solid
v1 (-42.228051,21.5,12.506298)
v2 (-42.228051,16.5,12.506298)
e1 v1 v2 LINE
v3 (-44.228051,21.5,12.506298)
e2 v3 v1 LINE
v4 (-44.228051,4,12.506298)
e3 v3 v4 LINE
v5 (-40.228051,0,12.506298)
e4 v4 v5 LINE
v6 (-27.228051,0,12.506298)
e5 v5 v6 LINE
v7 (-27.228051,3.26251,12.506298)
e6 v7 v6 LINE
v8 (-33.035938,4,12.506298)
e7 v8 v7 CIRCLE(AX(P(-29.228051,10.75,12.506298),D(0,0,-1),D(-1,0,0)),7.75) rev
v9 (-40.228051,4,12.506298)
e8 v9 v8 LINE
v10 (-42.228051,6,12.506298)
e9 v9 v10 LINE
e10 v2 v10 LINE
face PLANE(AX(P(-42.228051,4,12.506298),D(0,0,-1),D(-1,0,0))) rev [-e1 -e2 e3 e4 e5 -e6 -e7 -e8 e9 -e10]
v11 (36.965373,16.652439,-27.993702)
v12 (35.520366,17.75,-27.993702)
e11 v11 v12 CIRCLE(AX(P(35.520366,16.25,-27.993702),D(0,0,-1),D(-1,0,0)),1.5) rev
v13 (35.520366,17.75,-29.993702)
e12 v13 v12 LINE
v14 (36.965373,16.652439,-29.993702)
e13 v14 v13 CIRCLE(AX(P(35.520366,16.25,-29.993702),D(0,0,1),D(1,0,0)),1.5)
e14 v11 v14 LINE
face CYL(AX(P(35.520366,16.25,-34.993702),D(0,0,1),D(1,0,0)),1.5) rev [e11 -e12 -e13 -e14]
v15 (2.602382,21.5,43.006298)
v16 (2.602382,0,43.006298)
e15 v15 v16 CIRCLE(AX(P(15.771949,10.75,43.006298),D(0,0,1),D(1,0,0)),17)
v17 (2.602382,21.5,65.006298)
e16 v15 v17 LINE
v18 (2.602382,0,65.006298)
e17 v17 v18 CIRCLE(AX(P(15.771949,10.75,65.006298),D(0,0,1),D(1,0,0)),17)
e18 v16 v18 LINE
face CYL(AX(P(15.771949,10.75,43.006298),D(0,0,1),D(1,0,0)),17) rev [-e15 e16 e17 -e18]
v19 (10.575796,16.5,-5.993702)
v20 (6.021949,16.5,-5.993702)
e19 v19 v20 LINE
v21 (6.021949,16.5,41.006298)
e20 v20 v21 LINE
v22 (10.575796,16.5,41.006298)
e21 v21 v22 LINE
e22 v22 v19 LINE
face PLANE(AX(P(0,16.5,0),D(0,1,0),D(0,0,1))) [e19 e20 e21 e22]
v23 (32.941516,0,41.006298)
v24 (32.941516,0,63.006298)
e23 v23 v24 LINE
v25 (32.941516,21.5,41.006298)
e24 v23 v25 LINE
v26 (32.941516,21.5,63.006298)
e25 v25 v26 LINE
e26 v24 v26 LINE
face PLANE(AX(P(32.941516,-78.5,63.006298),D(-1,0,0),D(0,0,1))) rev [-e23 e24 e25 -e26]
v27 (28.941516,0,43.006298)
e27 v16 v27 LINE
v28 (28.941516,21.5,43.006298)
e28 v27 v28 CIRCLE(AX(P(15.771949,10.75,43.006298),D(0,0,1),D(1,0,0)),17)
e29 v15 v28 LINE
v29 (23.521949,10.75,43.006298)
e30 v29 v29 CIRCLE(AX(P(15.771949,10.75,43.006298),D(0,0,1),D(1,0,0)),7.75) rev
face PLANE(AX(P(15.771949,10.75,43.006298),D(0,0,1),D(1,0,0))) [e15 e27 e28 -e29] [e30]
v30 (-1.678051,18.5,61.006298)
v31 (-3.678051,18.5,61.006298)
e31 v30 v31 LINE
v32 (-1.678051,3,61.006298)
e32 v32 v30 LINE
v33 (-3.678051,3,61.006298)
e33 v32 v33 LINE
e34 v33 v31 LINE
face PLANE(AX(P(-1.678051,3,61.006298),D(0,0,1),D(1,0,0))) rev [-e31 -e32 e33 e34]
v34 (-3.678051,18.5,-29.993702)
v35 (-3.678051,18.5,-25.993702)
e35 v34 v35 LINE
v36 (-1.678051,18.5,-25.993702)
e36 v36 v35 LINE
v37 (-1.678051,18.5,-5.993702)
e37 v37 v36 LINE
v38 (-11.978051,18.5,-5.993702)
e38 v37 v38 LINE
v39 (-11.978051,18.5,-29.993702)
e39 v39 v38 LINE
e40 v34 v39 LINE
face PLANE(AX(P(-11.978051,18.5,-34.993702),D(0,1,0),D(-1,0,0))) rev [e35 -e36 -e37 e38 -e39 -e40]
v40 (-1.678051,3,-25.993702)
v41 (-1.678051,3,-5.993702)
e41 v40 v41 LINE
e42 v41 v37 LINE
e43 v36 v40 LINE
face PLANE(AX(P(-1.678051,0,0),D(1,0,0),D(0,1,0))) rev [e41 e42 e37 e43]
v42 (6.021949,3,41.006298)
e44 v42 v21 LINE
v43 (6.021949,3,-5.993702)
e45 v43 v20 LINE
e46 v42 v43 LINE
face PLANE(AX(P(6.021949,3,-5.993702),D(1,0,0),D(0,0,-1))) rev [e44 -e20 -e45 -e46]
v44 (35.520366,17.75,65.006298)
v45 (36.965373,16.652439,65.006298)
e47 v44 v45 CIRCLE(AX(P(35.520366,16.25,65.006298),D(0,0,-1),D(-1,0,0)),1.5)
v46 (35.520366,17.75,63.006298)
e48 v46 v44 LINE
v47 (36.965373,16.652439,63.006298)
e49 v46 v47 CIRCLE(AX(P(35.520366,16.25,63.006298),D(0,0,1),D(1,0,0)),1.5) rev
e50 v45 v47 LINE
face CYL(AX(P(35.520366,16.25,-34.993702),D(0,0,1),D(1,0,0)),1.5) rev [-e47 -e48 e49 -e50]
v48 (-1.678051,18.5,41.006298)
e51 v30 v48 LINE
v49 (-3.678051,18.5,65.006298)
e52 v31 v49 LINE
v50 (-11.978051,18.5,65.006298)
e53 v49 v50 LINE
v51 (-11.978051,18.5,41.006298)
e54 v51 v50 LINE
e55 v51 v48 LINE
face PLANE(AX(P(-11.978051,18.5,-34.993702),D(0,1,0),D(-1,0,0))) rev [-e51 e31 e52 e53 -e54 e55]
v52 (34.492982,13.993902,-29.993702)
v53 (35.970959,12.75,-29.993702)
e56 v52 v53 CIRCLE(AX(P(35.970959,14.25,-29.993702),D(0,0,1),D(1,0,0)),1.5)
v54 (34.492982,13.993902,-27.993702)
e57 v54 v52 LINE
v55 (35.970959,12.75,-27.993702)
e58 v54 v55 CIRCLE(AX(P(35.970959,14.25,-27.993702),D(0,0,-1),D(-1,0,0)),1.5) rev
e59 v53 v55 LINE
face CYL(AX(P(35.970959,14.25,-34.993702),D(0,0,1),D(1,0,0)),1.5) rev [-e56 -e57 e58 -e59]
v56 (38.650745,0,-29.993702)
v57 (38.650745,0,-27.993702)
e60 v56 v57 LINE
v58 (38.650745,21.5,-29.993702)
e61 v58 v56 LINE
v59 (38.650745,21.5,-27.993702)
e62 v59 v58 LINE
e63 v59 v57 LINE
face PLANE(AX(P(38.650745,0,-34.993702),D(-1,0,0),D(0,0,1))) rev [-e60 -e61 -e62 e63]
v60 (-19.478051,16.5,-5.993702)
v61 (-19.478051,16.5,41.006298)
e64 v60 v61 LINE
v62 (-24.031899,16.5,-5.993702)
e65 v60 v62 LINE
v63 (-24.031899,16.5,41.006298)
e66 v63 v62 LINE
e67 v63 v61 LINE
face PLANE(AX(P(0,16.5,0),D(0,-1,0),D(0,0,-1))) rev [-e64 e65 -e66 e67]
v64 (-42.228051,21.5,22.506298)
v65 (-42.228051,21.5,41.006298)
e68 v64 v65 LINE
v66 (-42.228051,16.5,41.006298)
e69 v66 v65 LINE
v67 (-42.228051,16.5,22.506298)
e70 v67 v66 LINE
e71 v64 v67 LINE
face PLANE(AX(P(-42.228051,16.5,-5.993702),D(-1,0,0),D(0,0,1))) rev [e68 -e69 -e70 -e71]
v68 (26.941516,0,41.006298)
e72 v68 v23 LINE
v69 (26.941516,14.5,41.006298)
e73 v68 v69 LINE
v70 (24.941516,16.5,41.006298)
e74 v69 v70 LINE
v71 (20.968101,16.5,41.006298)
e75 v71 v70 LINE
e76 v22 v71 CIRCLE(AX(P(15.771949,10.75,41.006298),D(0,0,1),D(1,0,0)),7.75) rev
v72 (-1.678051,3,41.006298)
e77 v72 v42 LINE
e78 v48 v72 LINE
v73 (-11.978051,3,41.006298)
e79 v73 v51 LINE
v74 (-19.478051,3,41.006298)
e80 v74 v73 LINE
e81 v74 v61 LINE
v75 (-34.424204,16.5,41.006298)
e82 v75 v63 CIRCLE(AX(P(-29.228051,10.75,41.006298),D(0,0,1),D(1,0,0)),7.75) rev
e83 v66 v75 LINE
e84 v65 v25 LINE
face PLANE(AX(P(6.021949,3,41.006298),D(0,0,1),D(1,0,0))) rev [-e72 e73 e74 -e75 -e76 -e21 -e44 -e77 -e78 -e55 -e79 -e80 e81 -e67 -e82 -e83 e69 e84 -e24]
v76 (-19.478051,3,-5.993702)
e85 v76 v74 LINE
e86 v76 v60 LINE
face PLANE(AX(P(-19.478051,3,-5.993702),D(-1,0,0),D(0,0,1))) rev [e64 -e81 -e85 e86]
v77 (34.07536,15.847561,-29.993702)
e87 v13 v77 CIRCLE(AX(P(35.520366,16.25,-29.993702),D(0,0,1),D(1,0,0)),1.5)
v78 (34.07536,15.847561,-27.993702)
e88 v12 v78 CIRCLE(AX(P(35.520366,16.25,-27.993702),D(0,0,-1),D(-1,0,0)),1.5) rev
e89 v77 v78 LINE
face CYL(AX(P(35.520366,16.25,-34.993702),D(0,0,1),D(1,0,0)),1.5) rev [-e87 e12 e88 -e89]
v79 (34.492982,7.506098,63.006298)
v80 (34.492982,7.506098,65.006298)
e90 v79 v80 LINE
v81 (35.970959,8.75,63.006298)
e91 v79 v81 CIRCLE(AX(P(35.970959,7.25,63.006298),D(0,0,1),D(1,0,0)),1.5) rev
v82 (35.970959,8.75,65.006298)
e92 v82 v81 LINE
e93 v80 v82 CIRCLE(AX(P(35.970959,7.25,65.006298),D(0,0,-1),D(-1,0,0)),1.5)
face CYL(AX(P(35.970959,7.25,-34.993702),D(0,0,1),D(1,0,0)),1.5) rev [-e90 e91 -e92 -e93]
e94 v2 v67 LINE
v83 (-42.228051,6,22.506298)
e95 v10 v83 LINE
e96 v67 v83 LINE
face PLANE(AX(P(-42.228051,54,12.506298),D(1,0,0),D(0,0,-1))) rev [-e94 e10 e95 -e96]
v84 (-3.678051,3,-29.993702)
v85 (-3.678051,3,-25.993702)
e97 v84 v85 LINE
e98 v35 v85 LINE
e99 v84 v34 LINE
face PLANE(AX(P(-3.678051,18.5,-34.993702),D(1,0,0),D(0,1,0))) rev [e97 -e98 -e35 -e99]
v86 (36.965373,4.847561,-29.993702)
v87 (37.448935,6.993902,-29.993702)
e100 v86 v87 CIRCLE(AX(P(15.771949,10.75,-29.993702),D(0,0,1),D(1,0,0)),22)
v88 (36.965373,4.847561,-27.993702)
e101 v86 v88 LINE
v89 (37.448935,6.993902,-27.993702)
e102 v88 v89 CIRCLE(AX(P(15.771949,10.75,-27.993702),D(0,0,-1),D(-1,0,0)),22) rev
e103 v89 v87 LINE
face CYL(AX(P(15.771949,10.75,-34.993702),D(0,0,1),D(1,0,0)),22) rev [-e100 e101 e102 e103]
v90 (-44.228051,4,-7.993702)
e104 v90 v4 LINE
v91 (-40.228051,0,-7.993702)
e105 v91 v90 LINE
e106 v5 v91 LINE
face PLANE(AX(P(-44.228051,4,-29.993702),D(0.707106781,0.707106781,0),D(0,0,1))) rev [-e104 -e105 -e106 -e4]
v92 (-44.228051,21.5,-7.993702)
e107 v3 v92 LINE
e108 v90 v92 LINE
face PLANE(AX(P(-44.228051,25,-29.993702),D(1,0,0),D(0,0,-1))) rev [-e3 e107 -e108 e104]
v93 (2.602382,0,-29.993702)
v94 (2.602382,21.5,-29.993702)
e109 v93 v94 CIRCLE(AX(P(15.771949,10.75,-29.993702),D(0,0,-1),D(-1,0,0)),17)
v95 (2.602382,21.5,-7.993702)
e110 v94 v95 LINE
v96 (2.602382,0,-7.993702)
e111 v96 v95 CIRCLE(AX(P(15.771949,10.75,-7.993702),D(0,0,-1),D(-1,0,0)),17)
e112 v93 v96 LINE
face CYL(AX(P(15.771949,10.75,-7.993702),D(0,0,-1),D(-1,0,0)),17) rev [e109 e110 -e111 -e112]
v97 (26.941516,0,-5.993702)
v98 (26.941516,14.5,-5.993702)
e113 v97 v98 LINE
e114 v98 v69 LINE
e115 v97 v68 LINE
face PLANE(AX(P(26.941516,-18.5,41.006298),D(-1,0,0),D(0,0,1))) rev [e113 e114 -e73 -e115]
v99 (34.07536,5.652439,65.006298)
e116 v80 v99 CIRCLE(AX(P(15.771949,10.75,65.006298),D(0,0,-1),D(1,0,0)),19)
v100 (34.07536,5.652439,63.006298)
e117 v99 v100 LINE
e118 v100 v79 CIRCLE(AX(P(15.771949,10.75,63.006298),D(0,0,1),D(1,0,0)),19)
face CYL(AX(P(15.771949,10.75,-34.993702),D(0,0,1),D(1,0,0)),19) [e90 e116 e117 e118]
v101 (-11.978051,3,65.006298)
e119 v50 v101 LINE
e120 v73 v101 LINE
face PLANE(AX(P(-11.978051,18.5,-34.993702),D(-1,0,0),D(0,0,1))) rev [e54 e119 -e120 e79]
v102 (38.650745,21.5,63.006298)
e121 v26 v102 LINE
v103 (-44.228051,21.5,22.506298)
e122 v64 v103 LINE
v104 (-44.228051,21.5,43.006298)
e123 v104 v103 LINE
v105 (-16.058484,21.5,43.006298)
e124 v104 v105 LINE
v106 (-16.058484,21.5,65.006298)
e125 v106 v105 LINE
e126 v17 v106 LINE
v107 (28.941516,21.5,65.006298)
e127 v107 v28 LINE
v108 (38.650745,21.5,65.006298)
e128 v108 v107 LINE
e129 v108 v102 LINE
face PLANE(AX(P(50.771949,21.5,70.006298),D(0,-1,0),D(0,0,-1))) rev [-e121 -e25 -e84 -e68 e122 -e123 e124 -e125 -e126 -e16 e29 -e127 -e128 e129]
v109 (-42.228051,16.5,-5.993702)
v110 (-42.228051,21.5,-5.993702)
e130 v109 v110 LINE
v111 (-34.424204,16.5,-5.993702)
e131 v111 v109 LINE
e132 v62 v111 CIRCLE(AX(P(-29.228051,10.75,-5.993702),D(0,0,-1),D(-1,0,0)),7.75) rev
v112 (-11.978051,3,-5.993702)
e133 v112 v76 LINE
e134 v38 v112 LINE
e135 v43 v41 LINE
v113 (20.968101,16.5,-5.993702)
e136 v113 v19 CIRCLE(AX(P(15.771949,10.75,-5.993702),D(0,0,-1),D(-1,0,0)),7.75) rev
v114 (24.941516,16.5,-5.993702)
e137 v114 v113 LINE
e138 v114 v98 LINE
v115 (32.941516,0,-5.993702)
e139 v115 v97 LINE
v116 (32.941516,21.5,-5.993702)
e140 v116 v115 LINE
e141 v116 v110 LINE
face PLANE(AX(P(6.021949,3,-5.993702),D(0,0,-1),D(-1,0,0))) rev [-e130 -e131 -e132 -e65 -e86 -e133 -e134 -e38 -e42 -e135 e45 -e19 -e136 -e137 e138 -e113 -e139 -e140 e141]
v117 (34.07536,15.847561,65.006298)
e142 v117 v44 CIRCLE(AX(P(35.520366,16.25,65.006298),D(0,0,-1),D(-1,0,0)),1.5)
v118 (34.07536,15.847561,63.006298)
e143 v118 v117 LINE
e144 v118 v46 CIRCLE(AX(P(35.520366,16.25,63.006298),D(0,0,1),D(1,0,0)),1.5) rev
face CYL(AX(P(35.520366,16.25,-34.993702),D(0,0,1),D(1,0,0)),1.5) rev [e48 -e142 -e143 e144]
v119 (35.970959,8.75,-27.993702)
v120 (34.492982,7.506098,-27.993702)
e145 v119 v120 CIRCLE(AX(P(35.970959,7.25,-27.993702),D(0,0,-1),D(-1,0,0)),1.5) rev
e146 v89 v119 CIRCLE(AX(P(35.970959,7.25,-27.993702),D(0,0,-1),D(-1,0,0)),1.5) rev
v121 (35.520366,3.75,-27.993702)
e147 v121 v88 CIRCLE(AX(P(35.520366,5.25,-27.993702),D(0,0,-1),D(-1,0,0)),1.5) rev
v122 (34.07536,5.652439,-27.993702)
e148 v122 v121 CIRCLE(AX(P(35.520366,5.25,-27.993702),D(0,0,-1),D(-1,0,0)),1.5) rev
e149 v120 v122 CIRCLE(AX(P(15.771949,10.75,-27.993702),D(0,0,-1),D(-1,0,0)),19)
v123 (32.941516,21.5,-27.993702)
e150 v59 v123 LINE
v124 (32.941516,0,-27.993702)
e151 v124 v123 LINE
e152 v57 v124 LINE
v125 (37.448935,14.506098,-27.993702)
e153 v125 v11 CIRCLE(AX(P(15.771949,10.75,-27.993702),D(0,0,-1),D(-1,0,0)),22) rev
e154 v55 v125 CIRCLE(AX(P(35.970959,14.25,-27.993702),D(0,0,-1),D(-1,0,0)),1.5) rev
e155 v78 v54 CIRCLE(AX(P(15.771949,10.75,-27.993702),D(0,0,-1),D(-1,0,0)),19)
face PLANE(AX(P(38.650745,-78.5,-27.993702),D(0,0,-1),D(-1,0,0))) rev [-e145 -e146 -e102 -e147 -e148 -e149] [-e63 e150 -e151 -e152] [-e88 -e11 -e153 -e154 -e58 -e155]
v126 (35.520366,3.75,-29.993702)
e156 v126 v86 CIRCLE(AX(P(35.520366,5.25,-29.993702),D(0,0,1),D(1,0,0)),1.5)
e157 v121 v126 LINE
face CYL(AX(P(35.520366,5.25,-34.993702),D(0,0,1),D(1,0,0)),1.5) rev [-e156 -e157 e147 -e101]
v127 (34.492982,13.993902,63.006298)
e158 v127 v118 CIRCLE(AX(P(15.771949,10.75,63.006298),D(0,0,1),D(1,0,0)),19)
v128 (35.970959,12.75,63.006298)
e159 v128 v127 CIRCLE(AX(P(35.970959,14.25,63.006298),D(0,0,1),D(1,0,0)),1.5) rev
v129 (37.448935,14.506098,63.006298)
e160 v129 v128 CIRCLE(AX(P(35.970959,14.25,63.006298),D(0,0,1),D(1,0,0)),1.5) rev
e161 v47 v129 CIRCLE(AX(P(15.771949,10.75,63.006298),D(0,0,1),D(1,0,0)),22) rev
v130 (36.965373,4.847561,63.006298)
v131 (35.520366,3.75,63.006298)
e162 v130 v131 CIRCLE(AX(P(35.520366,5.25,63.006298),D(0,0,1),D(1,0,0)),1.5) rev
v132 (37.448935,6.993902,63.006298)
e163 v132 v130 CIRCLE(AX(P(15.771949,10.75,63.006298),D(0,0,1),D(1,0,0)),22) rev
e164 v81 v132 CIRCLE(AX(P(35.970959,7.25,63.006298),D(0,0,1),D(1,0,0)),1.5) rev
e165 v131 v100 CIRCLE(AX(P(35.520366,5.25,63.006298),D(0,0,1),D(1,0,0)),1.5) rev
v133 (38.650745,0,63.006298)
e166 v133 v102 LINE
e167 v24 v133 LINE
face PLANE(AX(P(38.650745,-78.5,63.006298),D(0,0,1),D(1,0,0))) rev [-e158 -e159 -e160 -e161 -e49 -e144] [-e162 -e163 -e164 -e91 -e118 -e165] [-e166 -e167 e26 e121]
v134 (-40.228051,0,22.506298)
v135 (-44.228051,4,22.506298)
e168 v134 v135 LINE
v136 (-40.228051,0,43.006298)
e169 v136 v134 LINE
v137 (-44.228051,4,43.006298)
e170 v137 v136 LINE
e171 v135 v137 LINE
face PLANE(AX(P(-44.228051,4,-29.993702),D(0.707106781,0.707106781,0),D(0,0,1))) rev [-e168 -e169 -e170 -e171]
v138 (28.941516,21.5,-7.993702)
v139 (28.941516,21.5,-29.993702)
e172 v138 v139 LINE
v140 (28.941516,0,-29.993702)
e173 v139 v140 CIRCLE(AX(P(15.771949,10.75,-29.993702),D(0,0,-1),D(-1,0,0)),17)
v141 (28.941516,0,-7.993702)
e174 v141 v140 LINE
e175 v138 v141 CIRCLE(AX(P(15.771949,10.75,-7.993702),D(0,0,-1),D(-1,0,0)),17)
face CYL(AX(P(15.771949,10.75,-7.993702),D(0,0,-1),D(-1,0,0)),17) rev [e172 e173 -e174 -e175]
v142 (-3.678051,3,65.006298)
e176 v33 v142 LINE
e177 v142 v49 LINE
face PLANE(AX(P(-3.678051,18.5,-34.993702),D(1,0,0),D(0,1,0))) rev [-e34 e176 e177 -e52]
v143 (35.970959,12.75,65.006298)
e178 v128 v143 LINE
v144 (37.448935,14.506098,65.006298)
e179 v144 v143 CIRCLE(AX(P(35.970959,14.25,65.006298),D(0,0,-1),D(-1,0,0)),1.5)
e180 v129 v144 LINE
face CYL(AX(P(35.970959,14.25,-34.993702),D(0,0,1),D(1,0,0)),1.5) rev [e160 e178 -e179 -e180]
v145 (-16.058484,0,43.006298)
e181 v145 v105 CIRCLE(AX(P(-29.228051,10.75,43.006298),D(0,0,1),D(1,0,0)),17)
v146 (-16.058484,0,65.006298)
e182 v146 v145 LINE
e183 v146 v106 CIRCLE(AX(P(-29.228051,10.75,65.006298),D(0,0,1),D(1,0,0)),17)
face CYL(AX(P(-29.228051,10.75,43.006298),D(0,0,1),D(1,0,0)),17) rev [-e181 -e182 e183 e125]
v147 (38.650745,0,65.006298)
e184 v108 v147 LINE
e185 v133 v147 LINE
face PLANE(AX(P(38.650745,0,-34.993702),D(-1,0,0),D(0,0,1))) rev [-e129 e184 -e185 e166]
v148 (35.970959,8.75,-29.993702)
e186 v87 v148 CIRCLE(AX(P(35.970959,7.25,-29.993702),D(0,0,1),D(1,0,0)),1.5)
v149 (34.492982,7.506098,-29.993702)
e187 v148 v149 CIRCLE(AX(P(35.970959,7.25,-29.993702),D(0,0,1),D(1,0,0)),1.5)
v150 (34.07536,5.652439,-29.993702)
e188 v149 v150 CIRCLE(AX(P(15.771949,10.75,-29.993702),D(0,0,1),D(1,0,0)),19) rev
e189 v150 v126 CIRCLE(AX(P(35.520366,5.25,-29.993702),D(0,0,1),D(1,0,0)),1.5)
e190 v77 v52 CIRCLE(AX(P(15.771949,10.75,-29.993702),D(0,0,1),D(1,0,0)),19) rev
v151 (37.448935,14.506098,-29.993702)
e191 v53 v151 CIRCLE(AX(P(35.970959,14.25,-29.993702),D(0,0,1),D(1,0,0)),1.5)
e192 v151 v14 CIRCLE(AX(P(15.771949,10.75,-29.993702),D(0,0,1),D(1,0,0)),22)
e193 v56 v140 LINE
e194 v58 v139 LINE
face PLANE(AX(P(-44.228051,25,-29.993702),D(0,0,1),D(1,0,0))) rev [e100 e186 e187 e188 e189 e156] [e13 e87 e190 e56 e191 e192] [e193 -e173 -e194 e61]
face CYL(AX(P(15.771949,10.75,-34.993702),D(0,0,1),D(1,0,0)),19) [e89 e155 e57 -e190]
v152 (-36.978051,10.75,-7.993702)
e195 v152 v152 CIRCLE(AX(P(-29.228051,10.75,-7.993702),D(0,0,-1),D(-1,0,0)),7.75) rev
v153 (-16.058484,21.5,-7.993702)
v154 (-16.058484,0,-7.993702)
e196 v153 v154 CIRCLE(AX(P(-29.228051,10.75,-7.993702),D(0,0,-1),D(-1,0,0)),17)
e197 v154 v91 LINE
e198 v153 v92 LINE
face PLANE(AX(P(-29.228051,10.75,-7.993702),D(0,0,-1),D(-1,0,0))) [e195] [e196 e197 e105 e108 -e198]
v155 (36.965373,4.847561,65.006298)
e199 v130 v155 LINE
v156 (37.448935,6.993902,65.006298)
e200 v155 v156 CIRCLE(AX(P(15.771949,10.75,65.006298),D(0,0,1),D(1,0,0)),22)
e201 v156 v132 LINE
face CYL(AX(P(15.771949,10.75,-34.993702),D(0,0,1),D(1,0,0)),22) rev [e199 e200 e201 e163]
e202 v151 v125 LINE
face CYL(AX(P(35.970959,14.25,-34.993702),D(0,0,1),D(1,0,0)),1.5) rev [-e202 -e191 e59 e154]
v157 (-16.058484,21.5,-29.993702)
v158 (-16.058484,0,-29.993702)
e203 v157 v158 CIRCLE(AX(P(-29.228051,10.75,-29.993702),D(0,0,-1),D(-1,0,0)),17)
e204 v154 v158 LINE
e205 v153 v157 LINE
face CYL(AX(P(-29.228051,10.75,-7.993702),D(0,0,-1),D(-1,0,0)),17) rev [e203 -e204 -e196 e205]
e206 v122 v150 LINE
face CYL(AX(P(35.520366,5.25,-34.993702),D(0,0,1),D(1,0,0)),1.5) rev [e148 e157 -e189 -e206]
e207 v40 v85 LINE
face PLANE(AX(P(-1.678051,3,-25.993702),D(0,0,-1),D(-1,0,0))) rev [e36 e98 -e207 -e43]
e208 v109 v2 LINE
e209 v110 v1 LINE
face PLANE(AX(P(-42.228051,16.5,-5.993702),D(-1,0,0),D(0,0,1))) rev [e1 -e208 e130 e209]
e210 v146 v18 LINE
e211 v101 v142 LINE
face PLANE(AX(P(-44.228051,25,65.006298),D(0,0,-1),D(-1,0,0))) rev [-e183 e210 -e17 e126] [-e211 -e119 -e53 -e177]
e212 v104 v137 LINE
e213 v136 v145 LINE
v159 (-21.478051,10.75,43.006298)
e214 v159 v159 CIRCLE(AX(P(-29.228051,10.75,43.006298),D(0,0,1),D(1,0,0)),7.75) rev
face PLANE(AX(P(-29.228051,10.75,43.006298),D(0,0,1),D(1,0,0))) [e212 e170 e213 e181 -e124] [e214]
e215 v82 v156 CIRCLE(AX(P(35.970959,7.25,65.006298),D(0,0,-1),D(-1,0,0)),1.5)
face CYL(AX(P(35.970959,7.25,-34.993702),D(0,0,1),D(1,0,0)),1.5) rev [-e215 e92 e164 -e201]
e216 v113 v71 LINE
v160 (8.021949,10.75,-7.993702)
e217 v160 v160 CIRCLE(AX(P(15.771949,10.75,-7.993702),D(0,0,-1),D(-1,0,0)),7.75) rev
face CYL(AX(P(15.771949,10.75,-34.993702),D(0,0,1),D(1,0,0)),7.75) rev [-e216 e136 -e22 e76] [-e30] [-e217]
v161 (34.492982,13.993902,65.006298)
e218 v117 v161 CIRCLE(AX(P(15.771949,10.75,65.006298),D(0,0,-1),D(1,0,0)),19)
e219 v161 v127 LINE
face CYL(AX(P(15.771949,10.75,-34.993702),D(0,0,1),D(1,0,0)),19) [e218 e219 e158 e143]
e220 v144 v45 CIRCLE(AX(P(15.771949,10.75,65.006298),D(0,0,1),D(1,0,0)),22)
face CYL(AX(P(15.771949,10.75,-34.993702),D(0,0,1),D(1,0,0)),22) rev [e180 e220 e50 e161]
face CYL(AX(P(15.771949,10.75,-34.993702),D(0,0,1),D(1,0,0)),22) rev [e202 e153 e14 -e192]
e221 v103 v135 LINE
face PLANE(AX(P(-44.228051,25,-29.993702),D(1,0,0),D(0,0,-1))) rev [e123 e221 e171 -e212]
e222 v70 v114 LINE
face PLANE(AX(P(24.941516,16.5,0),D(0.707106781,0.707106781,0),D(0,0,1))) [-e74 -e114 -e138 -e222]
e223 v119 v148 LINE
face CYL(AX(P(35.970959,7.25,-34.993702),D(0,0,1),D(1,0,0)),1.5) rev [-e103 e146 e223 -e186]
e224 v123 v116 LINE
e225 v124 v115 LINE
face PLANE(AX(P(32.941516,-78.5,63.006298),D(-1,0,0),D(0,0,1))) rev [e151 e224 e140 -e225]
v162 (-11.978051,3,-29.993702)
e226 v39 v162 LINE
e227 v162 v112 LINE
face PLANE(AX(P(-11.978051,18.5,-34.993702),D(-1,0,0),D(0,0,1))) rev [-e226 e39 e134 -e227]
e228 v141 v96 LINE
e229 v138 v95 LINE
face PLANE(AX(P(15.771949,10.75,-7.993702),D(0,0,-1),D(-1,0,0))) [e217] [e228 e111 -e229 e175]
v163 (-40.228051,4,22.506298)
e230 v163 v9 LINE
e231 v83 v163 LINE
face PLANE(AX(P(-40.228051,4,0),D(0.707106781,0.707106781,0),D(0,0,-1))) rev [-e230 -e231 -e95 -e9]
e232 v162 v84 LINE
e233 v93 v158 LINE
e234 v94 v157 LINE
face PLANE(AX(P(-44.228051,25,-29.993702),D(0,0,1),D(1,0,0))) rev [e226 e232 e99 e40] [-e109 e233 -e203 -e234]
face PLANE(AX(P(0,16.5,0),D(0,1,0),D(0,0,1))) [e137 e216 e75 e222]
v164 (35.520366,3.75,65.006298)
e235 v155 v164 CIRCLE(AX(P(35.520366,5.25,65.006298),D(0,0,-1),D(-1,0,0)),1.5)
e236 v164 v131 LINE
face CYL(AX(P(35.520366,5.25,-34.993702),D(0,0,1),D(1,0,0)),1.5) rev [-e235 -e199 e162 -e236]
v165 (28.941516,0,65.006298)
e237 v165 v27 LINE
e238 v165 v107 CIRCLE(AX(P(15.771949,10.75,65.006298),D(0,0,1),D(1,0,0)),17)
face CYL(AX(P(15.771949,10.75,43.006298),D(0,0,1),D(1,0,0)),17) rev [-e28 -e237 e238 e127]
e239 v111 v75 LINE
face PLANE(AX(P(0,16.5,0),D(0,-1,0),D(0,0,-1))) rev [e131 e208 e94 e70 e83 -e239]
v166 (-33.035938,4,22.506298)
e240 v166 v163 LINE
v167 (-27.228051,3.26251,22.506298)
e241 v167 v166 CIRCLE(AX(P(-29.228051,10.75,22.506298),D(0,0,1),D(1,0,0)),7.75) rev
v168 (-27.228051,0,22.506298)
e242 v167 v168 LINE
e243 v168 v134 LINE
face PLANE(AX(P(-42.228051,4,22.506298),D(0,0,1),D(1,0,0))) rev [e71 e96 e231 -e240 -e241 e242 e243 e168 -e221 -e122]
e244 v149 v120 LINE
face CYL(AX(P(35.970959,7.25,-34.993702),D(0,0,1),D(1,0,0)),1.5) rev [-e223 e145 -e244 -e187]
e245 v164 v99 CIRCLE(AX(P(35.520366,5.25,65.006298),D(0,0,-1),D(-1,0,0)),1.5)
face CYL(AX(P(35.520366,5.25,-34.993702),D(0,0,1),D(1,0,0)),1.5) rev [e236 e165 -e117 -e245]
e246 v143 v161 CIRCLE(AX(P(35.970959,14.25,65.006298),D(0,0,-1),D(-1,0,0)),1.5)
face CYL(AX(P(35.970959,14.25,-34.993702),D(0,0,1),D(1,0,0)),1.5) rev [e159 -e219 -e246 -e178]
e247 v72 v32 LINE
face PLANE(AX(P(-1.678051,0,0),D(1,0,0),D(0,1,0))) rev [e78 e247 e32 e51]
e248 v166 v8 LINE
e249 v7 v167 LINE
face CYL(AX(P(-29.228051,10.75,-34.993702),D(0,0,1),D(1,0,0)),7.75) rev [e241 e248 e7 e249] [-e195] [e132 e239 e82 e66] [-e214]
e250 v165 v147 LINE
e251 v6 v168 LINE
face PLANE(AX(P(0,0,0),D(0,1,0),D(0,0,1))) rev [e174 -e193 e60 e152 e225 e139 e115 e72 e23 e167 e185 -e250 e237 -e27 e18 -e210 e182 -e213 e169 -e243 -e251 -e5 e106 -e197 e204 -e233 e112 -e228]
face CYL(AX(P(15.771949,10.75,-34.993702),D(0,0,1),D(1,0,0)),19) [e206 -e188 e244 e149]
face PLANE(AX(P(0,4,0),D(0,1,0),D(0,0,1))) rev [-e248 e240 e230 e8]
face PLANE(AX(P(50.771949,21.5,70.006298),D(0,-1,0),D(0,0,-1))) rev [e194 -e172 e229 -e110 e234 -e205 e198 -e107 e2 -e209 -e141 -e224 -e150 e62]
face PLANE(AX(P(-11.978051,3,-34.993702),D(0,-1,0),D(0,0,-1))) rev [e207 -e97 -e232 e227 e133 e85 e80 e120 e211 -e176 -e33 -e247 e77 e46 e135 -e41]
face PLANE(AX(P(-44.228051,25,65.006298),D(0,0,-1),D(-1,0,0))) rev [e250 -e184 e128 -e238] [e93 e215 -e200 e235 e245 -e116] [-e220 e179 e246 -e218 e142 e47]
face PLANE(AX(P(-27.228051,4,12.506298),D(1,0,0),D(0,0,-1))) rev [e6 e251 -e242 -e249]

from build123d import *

# Parameters (mm, degrees)
SKETCH1_W           = 95
SKETCH1_H           = 95
BOSS_EXTRUDE1_DEPTH = 25
SKETCH2_R           = 7.75
CUT_EXTRUDE2_DEPTH  = 100
SKETCH3_R           = 17
CUT_EXTRUDE3_DEPTH  = 22
CUT_EXTRUDE4_START  = -22
SKETCH4_R           = 17
CUT_EXTRUDE4_DEPTH  = 22
SKETCH5_W           = 6.246993927
SKETCH5_H           = 25
CUT_EXTRUDE5_DEPTH  = 22
SKETCH6_W           = 7.178723585
SKETCH6_H           = 25
CUT_EXTRUDE6_DEPTH  = 22
SKETCH8_W           = 99.503929421
SKETCH8_H           = 3.5
CUT_EXTRUDE7_DEPTH  = 100
SKETCH9_W           = 8.3
SKETCH9_H           = 15.5
CUT_EXTRUDE11_DEPTH = 100
SKETCH13_W          = 87
SKETCH13_H          = 15.5
CUT_EXTRUDE12_DEPTH = 2
SKETCH14_W          = 25.5
SKETCH14_H          = 47
CUT_EXTRUDE14_DEPTH = 18.5
SKETCH16_W          = 24.75
SKETCH16_H          = 47
CUT_EXTRUDE15_DEPTH = 5
SKETCH17_W          = 20.919567191
SKETCH17_H          = 47
CUT_EXTRUDE16_DEPTH = 5
CUT_EXTRUDE17_DEPTH = 100
FILLET6_R           = 1.5
FILLET7_R           = 1.5
FILLET8_R           = 1.5
FILLET9_R           = 1.5
SKETCH19_W          = 12.12120401
SKETCH19_H          = 21.5
CUT_EXTRUDE20_DEPTH = 100
SKETCH20_W          = 5.709228799
SKETCH20_H          = 91
CUT_EXTRUDE23_DEPTH = 100
SKETCH21_W          = 6
SKETCH21_H          = 47
CUT_EXTRUDE26_DEPTH = 40
CHAMFER1_SIZE       = 2
SKETCH22_W          = 15
SKETCH22_H          = 10
CUT_EXTRUDE27_DEPTH = 4
SKETCH23_W          = 2
SKETCH23_H          = 10
CUT_EXTRUDE28_DEPTH = 54
CHAMFER2_SIZE       = 2
CHAMFER3_SIZE       = 4
CHAMFER4_SIZE       = 4


with BuildPart() as part:
    # Sketch1 → Boss-Extrude1 (new body)
    with BuildSketch(Plane(origin=(0, 0, 0), x_dir=(1, 0, 0), z_dir=(0, 1, 0))):
        with Locations((3.271948822, -17.506298191)):
            Rectangle(SKETCH1_W, SKETCH1_H)
    extrude(amount=BOSS_EXTRUDE1_DEPTH)

    # Sketch2 → Cut-Extrude2 (cut)
    with BuildSketch(Plane.XY.offset(65.006298191)):
        with Locations((-29.228051178, 10.75)):
            Circle(SKETCH2_R)
        with Locations((15.771948822, 10.75)):
            Circle(SKETCH2_R)
    extrude(amount=-CUT_EXTRUDE2_DEPTH, mode=Mode.SUBTRACT)

    # Sketch3 → Cut-Extrude3 (cut)
    with BuildSketch(Plane.XY.offset(65.006298191)):
        with Locations((-29.228051178, 10.75)):
            Circle(SKETCH3_R)
        with Locations((15.771948822, 10.75)):
            Circle(SKETCH3_R)
    extrude(amount=-CUT_EXTRUDE3_DEPTH, mode=Mode.SUBTRACT)

    # Sketch4 → Cut-Extrude4 (cut)
    with BuildSketch(Plane(origin=(0, 0, -29.993701809), x_dir=(-1, 0, 0), z_dir=(0, 0, -1)).offset(CUT_EXTRUDE4_START)):
        with Locations((-15.771948822, 10.75)):
            Circle(SKETCH4_R)
        with Locations((29.228051178, 10.75)):
            Circle(SKETCH4_R)
    extrude(amount=CUT_EXTRUDE4_DEPTH, mode=Mode.SUBTRACT)

    # Sketch5 → Cut-Extrude5 (cut)
    with BuildSketch(Plane.XY.offset(65.006298191)):
        with Locations((-41.104554214, 12.5)):
            Rectangle(SKETCH5_W, SKETCH5_H)
    extrude(amount=-CUT_EXTRUDE5_DEPTH, mode=Mode.SUBTRACT)

    # Sketch6 → Cut-Extrude6 (cut)
    with BuildSketch(Plane(origin=(0, 0, -29.993701809), x_dir=(-1, 0, 0), z_dir=(0, 0, -1))):
        with Locations((40.638689386, 12.5)):
            Rectangle(SKETCH6_W, SKETCH6_H)
    extrude(amount=-CUT_EXTRUDE6_DEPTH, mode=Mode.SUBTRACT)

    # Sketch8 → Cut-Extrude7 (cut)
    with BuildSketch(Plane(origin=(0, 0, -29.993701809), x_dir=(-1, 0, 0), z_dir=(0, 0, -1))):
        with Locations((-1.019984112, 23.25)):
            Rectangle(SKETCH8_W, SKETCH8_H)
    extrude(amount=-CUT_EXTRUDE7_DEPTH, mode=Mode.SUBTRACT)

    # Sketch9 → Cut-Extrude11 (cut)
    with BuildSketch(Plane.XY.offset(65.006298191)):
        with Locations((-7.828051178, 10.75)):
            Rectangle(SKETCH9_W, SKETCH9_H)
    extrude(amount=-CUT_EXTRUDE11_DEPTH, mode=Mode.SUBTRACT)

    # Sketch13 → Cut-Extrude12 (cut)
    with BuildSketch(Plane.ZY.offset(3.678051178)):
        with Locations((17.506298191, 10.75)):
            Rectangle(SKETCH13_W, SKETCH13_H)
    extrude(amount=-CUT_EXTRUDE12_DEPTH, mode=Mode.SUBTRACT)

    # Sketch14 → Cut-Extrude14 (cut)
    with BuildSketch(Plane(origin=(0, 21.5, 0), x_dir=(1, 0, 0), z_dir=(0, 1, 0))):
        with Locations((-6.728051178, -17.506298191)):
            Rectangle(SKETCH14_W, SKETCH14_H)
    extrude(amount=-CUT_EXTRUDE14_DEPTH, mode=Mode.SUBTRACT)

    # Sketch16 → Cut-Extrude15 (cut)
    with BuildSketch(Plane(origin=(0, 21.5, 0), x_dir=(1, 0, 0), z_dir=(0, 1, 0))):
        with Locations((-29.853051178, -17.506298191)):
            Rectangle(SKETCH16_W, SKETCH16_H)
    extrude(amount=-CUT_EXTRUDE15_DEPTH, mode=Mode.SUBTRACT)

    # Sketch17 → Cut-Extrude16 (cut)
    with BuildSketch(Plane(origin=(0, 21.5, 0), x_dir=(1, 0, 0), z_dir=(0, 1, 0))):
        with Locations((16.481732418, -17.506298191)):
            Rectangle(SKETCH17_W, SKETCH17_H)
    extrude(amount=-CUT_EXTRUDE16_DEPTH, mode=Mode.SUBTRACT)

    # Sketch18 → Cut-Extrude17 (cut)
    with BuildSketch(Plane.XY.offset(65.006298191)):
        with BuildLine():
            Line((34.66639245, 12.75), (37.680851122, 12.75))
            ThreePointArc((37.680851122, 12.75), (37.300376381, 15.28065192), (36.628602437, 17.75))
            Line((36.628602437, 17.75), (33.435470555, 17.75))
            ThreePointArc((33.435470555, 17.75), (34.221100776, 15.291893017), (34.66639245, 12.75))
        make_face()
        with BuildLine():
            Line((34.66639245, 8.75), (37.680851122, 8.75))
            ThreePointArc((37.680851122, 8.75), (37.300376381, 6.21934808), (36.628602437, 3.75))
            Line((36.628602437, 3.75), (33.435470555, 3.75))
            ThreePointArc((33.435470555, 3.75), (34.221100776, 6.208106983), (34.66639245, 8.75))
        make_face()
    extrude(amount=-CUT_EXTRUDE17_DEPTH, mode=Mode.SUBTRACT)

    # Fillet6
    fillet6_edges = [part.edges().sort_by_distance(p)[0] for p in [
        (33.435470555, 17.75, 17.506298191),
        (36.628602437, 17.75, 17.506298191),
    ]]
    fillet(fillet6_edges, radius=FILLET6_R - 0.0001)  # a hair under: the kernel refuses the full size

    # Fillet7
    fillet7_edges = [part.edges().sort_by_distance(p)[0] for p in [
        (37.680851122, 12.75, 17.506298191),
        (34.66639245, 12.75, 17.506298191),
    ]]
    fillet(fillet7_edges, radius=FILLET7_R - 0.0001)  # a hair under: the kernel refuses the full size

    # Fillet8
    fillet8_edges = [part.edges().sort_by_distance(p)[0] for p in [
        (33.435470555, 3.75, 17.506298191),
        (36.628602437, 3.75, 17.506298191),
    ]]
    fillet(fillet8_edges, radius=FILLET8_R - 0.0001)  # a hair under: the kernel refuses the full size

    # Fillet9
    fillet9_edges = [part.edges().sort_by_distance(p)[0] for p in [
        (37.680851122, 8.75, 17.506298191),
        (34.66639245, 8.75, 17.506298191),
    ]]
    fillet(fillet9_edges, radius=FILLET9_R - 0.0001)  # a hair under: the kernel refuses the full size

    # Sketch19 → Cut-Extrude20 (cut)
    with BuildSketch(Plane.XY.offset(65.006298191)):
        with Locations((44.711346817, 10.75)):
            Rectangle(SKETCH19_W, SKETCH19_H)
    extrude(amount=-CUT_EXTRUDE20_DEPTH, mode=Mode.SUBTRACT)

    # Sketch20 → Cut-Extrude23 (cut)
    with BuildSketch(Plane(origin=(0, 21.5, 0), x_dir=(1, 0, 0), z_dir=(0, 1, 0))):
        with Locations((35.796130413, -17.506298191)):
            Rectangle(SKETCH20_W, SKETCH20_H)
    extrude(amount=-CUT_EXTRUDE23_DEPTH, mode=Mode.SUBTRACT)

    # Sketch21 → Cut-Extrude26 (cut)
    with BuildSketch(Plane(origin=(0, 21.5, 0), x_dir=(1, 0, 0), z_dir=(0, 1, 0))):
        with Locations((29.941516013, -17.506298191)):
            Rectangle(SKETCH21_W, SKETCH21_H)
    extrude(amount=-CUT_EXTRUDE26_DEPTH, mode=Mode.SUBTRACT)

    # Chamfer1
    chamfer1_edges = [part.edges().sort_by_distance(p)[0] for p in [
        (26.941516013, 16.5, 17.506298191),
    ]]
    chamfer(chamfer1_edges, length=CHAMFER1_SIZE)

    # Sketch22 → Cut-Extrude27 (cut)
    with BuildSketch(Plane(origin=(0, 0, 0), x_dir=(-1, 0, 0), z_dir=(0, -1, 0))):
        with Locations((34.728051178, -17.506298191)):
            Rectangle(SKETCH22_W, SKETCH22_H)
    extrude(amount=-CUT_EXTRUDE27_DEPTH, mode=Mode.SUBTRACT)

    # Sketch23 → Cut-Extrude28 (cut)
    with BuildSketch(Plane(origin=(0, 0, 0), x_dir=(-1, 0, 0), z_dir=(0, -1, 0))):
        with Locations((43.228051178, -17.506298191)):
            Rectangle(SKETCH23_W, SKETCH23_H)
    extrude(amount=-CUT_EXTRUDE28_DEPTH, mode=Mode.SUBTRACT)

    # Chamfer2
    chamfer2_edges = [part.edges().sort_by_distance(p)[0] for p in [
        (-42.228051178, 4, 17.506298191),
    ]]
    chamfer(chamfer2_edges, length=CHAMFER2_SIZE)

    # Chamfer3
    chamfer3_edges = [part.edges().sort_by_distance(p)[0] for p in [
        (-44.228051178, 0, 2.256298191),
    ]]
    chamfer(chamfer3_edges, length=CHAMFER3_SIZE)

    # Chamfer4
    chamfer4_edges = [part.edges().sort_by_distance(p)[0] for p in [
        (-44.228051178, 0, 32.756298191),
    ]]
    chamfer(chamfer4_edges, length=CHAMFER4_SIZE)


solid = part.part
